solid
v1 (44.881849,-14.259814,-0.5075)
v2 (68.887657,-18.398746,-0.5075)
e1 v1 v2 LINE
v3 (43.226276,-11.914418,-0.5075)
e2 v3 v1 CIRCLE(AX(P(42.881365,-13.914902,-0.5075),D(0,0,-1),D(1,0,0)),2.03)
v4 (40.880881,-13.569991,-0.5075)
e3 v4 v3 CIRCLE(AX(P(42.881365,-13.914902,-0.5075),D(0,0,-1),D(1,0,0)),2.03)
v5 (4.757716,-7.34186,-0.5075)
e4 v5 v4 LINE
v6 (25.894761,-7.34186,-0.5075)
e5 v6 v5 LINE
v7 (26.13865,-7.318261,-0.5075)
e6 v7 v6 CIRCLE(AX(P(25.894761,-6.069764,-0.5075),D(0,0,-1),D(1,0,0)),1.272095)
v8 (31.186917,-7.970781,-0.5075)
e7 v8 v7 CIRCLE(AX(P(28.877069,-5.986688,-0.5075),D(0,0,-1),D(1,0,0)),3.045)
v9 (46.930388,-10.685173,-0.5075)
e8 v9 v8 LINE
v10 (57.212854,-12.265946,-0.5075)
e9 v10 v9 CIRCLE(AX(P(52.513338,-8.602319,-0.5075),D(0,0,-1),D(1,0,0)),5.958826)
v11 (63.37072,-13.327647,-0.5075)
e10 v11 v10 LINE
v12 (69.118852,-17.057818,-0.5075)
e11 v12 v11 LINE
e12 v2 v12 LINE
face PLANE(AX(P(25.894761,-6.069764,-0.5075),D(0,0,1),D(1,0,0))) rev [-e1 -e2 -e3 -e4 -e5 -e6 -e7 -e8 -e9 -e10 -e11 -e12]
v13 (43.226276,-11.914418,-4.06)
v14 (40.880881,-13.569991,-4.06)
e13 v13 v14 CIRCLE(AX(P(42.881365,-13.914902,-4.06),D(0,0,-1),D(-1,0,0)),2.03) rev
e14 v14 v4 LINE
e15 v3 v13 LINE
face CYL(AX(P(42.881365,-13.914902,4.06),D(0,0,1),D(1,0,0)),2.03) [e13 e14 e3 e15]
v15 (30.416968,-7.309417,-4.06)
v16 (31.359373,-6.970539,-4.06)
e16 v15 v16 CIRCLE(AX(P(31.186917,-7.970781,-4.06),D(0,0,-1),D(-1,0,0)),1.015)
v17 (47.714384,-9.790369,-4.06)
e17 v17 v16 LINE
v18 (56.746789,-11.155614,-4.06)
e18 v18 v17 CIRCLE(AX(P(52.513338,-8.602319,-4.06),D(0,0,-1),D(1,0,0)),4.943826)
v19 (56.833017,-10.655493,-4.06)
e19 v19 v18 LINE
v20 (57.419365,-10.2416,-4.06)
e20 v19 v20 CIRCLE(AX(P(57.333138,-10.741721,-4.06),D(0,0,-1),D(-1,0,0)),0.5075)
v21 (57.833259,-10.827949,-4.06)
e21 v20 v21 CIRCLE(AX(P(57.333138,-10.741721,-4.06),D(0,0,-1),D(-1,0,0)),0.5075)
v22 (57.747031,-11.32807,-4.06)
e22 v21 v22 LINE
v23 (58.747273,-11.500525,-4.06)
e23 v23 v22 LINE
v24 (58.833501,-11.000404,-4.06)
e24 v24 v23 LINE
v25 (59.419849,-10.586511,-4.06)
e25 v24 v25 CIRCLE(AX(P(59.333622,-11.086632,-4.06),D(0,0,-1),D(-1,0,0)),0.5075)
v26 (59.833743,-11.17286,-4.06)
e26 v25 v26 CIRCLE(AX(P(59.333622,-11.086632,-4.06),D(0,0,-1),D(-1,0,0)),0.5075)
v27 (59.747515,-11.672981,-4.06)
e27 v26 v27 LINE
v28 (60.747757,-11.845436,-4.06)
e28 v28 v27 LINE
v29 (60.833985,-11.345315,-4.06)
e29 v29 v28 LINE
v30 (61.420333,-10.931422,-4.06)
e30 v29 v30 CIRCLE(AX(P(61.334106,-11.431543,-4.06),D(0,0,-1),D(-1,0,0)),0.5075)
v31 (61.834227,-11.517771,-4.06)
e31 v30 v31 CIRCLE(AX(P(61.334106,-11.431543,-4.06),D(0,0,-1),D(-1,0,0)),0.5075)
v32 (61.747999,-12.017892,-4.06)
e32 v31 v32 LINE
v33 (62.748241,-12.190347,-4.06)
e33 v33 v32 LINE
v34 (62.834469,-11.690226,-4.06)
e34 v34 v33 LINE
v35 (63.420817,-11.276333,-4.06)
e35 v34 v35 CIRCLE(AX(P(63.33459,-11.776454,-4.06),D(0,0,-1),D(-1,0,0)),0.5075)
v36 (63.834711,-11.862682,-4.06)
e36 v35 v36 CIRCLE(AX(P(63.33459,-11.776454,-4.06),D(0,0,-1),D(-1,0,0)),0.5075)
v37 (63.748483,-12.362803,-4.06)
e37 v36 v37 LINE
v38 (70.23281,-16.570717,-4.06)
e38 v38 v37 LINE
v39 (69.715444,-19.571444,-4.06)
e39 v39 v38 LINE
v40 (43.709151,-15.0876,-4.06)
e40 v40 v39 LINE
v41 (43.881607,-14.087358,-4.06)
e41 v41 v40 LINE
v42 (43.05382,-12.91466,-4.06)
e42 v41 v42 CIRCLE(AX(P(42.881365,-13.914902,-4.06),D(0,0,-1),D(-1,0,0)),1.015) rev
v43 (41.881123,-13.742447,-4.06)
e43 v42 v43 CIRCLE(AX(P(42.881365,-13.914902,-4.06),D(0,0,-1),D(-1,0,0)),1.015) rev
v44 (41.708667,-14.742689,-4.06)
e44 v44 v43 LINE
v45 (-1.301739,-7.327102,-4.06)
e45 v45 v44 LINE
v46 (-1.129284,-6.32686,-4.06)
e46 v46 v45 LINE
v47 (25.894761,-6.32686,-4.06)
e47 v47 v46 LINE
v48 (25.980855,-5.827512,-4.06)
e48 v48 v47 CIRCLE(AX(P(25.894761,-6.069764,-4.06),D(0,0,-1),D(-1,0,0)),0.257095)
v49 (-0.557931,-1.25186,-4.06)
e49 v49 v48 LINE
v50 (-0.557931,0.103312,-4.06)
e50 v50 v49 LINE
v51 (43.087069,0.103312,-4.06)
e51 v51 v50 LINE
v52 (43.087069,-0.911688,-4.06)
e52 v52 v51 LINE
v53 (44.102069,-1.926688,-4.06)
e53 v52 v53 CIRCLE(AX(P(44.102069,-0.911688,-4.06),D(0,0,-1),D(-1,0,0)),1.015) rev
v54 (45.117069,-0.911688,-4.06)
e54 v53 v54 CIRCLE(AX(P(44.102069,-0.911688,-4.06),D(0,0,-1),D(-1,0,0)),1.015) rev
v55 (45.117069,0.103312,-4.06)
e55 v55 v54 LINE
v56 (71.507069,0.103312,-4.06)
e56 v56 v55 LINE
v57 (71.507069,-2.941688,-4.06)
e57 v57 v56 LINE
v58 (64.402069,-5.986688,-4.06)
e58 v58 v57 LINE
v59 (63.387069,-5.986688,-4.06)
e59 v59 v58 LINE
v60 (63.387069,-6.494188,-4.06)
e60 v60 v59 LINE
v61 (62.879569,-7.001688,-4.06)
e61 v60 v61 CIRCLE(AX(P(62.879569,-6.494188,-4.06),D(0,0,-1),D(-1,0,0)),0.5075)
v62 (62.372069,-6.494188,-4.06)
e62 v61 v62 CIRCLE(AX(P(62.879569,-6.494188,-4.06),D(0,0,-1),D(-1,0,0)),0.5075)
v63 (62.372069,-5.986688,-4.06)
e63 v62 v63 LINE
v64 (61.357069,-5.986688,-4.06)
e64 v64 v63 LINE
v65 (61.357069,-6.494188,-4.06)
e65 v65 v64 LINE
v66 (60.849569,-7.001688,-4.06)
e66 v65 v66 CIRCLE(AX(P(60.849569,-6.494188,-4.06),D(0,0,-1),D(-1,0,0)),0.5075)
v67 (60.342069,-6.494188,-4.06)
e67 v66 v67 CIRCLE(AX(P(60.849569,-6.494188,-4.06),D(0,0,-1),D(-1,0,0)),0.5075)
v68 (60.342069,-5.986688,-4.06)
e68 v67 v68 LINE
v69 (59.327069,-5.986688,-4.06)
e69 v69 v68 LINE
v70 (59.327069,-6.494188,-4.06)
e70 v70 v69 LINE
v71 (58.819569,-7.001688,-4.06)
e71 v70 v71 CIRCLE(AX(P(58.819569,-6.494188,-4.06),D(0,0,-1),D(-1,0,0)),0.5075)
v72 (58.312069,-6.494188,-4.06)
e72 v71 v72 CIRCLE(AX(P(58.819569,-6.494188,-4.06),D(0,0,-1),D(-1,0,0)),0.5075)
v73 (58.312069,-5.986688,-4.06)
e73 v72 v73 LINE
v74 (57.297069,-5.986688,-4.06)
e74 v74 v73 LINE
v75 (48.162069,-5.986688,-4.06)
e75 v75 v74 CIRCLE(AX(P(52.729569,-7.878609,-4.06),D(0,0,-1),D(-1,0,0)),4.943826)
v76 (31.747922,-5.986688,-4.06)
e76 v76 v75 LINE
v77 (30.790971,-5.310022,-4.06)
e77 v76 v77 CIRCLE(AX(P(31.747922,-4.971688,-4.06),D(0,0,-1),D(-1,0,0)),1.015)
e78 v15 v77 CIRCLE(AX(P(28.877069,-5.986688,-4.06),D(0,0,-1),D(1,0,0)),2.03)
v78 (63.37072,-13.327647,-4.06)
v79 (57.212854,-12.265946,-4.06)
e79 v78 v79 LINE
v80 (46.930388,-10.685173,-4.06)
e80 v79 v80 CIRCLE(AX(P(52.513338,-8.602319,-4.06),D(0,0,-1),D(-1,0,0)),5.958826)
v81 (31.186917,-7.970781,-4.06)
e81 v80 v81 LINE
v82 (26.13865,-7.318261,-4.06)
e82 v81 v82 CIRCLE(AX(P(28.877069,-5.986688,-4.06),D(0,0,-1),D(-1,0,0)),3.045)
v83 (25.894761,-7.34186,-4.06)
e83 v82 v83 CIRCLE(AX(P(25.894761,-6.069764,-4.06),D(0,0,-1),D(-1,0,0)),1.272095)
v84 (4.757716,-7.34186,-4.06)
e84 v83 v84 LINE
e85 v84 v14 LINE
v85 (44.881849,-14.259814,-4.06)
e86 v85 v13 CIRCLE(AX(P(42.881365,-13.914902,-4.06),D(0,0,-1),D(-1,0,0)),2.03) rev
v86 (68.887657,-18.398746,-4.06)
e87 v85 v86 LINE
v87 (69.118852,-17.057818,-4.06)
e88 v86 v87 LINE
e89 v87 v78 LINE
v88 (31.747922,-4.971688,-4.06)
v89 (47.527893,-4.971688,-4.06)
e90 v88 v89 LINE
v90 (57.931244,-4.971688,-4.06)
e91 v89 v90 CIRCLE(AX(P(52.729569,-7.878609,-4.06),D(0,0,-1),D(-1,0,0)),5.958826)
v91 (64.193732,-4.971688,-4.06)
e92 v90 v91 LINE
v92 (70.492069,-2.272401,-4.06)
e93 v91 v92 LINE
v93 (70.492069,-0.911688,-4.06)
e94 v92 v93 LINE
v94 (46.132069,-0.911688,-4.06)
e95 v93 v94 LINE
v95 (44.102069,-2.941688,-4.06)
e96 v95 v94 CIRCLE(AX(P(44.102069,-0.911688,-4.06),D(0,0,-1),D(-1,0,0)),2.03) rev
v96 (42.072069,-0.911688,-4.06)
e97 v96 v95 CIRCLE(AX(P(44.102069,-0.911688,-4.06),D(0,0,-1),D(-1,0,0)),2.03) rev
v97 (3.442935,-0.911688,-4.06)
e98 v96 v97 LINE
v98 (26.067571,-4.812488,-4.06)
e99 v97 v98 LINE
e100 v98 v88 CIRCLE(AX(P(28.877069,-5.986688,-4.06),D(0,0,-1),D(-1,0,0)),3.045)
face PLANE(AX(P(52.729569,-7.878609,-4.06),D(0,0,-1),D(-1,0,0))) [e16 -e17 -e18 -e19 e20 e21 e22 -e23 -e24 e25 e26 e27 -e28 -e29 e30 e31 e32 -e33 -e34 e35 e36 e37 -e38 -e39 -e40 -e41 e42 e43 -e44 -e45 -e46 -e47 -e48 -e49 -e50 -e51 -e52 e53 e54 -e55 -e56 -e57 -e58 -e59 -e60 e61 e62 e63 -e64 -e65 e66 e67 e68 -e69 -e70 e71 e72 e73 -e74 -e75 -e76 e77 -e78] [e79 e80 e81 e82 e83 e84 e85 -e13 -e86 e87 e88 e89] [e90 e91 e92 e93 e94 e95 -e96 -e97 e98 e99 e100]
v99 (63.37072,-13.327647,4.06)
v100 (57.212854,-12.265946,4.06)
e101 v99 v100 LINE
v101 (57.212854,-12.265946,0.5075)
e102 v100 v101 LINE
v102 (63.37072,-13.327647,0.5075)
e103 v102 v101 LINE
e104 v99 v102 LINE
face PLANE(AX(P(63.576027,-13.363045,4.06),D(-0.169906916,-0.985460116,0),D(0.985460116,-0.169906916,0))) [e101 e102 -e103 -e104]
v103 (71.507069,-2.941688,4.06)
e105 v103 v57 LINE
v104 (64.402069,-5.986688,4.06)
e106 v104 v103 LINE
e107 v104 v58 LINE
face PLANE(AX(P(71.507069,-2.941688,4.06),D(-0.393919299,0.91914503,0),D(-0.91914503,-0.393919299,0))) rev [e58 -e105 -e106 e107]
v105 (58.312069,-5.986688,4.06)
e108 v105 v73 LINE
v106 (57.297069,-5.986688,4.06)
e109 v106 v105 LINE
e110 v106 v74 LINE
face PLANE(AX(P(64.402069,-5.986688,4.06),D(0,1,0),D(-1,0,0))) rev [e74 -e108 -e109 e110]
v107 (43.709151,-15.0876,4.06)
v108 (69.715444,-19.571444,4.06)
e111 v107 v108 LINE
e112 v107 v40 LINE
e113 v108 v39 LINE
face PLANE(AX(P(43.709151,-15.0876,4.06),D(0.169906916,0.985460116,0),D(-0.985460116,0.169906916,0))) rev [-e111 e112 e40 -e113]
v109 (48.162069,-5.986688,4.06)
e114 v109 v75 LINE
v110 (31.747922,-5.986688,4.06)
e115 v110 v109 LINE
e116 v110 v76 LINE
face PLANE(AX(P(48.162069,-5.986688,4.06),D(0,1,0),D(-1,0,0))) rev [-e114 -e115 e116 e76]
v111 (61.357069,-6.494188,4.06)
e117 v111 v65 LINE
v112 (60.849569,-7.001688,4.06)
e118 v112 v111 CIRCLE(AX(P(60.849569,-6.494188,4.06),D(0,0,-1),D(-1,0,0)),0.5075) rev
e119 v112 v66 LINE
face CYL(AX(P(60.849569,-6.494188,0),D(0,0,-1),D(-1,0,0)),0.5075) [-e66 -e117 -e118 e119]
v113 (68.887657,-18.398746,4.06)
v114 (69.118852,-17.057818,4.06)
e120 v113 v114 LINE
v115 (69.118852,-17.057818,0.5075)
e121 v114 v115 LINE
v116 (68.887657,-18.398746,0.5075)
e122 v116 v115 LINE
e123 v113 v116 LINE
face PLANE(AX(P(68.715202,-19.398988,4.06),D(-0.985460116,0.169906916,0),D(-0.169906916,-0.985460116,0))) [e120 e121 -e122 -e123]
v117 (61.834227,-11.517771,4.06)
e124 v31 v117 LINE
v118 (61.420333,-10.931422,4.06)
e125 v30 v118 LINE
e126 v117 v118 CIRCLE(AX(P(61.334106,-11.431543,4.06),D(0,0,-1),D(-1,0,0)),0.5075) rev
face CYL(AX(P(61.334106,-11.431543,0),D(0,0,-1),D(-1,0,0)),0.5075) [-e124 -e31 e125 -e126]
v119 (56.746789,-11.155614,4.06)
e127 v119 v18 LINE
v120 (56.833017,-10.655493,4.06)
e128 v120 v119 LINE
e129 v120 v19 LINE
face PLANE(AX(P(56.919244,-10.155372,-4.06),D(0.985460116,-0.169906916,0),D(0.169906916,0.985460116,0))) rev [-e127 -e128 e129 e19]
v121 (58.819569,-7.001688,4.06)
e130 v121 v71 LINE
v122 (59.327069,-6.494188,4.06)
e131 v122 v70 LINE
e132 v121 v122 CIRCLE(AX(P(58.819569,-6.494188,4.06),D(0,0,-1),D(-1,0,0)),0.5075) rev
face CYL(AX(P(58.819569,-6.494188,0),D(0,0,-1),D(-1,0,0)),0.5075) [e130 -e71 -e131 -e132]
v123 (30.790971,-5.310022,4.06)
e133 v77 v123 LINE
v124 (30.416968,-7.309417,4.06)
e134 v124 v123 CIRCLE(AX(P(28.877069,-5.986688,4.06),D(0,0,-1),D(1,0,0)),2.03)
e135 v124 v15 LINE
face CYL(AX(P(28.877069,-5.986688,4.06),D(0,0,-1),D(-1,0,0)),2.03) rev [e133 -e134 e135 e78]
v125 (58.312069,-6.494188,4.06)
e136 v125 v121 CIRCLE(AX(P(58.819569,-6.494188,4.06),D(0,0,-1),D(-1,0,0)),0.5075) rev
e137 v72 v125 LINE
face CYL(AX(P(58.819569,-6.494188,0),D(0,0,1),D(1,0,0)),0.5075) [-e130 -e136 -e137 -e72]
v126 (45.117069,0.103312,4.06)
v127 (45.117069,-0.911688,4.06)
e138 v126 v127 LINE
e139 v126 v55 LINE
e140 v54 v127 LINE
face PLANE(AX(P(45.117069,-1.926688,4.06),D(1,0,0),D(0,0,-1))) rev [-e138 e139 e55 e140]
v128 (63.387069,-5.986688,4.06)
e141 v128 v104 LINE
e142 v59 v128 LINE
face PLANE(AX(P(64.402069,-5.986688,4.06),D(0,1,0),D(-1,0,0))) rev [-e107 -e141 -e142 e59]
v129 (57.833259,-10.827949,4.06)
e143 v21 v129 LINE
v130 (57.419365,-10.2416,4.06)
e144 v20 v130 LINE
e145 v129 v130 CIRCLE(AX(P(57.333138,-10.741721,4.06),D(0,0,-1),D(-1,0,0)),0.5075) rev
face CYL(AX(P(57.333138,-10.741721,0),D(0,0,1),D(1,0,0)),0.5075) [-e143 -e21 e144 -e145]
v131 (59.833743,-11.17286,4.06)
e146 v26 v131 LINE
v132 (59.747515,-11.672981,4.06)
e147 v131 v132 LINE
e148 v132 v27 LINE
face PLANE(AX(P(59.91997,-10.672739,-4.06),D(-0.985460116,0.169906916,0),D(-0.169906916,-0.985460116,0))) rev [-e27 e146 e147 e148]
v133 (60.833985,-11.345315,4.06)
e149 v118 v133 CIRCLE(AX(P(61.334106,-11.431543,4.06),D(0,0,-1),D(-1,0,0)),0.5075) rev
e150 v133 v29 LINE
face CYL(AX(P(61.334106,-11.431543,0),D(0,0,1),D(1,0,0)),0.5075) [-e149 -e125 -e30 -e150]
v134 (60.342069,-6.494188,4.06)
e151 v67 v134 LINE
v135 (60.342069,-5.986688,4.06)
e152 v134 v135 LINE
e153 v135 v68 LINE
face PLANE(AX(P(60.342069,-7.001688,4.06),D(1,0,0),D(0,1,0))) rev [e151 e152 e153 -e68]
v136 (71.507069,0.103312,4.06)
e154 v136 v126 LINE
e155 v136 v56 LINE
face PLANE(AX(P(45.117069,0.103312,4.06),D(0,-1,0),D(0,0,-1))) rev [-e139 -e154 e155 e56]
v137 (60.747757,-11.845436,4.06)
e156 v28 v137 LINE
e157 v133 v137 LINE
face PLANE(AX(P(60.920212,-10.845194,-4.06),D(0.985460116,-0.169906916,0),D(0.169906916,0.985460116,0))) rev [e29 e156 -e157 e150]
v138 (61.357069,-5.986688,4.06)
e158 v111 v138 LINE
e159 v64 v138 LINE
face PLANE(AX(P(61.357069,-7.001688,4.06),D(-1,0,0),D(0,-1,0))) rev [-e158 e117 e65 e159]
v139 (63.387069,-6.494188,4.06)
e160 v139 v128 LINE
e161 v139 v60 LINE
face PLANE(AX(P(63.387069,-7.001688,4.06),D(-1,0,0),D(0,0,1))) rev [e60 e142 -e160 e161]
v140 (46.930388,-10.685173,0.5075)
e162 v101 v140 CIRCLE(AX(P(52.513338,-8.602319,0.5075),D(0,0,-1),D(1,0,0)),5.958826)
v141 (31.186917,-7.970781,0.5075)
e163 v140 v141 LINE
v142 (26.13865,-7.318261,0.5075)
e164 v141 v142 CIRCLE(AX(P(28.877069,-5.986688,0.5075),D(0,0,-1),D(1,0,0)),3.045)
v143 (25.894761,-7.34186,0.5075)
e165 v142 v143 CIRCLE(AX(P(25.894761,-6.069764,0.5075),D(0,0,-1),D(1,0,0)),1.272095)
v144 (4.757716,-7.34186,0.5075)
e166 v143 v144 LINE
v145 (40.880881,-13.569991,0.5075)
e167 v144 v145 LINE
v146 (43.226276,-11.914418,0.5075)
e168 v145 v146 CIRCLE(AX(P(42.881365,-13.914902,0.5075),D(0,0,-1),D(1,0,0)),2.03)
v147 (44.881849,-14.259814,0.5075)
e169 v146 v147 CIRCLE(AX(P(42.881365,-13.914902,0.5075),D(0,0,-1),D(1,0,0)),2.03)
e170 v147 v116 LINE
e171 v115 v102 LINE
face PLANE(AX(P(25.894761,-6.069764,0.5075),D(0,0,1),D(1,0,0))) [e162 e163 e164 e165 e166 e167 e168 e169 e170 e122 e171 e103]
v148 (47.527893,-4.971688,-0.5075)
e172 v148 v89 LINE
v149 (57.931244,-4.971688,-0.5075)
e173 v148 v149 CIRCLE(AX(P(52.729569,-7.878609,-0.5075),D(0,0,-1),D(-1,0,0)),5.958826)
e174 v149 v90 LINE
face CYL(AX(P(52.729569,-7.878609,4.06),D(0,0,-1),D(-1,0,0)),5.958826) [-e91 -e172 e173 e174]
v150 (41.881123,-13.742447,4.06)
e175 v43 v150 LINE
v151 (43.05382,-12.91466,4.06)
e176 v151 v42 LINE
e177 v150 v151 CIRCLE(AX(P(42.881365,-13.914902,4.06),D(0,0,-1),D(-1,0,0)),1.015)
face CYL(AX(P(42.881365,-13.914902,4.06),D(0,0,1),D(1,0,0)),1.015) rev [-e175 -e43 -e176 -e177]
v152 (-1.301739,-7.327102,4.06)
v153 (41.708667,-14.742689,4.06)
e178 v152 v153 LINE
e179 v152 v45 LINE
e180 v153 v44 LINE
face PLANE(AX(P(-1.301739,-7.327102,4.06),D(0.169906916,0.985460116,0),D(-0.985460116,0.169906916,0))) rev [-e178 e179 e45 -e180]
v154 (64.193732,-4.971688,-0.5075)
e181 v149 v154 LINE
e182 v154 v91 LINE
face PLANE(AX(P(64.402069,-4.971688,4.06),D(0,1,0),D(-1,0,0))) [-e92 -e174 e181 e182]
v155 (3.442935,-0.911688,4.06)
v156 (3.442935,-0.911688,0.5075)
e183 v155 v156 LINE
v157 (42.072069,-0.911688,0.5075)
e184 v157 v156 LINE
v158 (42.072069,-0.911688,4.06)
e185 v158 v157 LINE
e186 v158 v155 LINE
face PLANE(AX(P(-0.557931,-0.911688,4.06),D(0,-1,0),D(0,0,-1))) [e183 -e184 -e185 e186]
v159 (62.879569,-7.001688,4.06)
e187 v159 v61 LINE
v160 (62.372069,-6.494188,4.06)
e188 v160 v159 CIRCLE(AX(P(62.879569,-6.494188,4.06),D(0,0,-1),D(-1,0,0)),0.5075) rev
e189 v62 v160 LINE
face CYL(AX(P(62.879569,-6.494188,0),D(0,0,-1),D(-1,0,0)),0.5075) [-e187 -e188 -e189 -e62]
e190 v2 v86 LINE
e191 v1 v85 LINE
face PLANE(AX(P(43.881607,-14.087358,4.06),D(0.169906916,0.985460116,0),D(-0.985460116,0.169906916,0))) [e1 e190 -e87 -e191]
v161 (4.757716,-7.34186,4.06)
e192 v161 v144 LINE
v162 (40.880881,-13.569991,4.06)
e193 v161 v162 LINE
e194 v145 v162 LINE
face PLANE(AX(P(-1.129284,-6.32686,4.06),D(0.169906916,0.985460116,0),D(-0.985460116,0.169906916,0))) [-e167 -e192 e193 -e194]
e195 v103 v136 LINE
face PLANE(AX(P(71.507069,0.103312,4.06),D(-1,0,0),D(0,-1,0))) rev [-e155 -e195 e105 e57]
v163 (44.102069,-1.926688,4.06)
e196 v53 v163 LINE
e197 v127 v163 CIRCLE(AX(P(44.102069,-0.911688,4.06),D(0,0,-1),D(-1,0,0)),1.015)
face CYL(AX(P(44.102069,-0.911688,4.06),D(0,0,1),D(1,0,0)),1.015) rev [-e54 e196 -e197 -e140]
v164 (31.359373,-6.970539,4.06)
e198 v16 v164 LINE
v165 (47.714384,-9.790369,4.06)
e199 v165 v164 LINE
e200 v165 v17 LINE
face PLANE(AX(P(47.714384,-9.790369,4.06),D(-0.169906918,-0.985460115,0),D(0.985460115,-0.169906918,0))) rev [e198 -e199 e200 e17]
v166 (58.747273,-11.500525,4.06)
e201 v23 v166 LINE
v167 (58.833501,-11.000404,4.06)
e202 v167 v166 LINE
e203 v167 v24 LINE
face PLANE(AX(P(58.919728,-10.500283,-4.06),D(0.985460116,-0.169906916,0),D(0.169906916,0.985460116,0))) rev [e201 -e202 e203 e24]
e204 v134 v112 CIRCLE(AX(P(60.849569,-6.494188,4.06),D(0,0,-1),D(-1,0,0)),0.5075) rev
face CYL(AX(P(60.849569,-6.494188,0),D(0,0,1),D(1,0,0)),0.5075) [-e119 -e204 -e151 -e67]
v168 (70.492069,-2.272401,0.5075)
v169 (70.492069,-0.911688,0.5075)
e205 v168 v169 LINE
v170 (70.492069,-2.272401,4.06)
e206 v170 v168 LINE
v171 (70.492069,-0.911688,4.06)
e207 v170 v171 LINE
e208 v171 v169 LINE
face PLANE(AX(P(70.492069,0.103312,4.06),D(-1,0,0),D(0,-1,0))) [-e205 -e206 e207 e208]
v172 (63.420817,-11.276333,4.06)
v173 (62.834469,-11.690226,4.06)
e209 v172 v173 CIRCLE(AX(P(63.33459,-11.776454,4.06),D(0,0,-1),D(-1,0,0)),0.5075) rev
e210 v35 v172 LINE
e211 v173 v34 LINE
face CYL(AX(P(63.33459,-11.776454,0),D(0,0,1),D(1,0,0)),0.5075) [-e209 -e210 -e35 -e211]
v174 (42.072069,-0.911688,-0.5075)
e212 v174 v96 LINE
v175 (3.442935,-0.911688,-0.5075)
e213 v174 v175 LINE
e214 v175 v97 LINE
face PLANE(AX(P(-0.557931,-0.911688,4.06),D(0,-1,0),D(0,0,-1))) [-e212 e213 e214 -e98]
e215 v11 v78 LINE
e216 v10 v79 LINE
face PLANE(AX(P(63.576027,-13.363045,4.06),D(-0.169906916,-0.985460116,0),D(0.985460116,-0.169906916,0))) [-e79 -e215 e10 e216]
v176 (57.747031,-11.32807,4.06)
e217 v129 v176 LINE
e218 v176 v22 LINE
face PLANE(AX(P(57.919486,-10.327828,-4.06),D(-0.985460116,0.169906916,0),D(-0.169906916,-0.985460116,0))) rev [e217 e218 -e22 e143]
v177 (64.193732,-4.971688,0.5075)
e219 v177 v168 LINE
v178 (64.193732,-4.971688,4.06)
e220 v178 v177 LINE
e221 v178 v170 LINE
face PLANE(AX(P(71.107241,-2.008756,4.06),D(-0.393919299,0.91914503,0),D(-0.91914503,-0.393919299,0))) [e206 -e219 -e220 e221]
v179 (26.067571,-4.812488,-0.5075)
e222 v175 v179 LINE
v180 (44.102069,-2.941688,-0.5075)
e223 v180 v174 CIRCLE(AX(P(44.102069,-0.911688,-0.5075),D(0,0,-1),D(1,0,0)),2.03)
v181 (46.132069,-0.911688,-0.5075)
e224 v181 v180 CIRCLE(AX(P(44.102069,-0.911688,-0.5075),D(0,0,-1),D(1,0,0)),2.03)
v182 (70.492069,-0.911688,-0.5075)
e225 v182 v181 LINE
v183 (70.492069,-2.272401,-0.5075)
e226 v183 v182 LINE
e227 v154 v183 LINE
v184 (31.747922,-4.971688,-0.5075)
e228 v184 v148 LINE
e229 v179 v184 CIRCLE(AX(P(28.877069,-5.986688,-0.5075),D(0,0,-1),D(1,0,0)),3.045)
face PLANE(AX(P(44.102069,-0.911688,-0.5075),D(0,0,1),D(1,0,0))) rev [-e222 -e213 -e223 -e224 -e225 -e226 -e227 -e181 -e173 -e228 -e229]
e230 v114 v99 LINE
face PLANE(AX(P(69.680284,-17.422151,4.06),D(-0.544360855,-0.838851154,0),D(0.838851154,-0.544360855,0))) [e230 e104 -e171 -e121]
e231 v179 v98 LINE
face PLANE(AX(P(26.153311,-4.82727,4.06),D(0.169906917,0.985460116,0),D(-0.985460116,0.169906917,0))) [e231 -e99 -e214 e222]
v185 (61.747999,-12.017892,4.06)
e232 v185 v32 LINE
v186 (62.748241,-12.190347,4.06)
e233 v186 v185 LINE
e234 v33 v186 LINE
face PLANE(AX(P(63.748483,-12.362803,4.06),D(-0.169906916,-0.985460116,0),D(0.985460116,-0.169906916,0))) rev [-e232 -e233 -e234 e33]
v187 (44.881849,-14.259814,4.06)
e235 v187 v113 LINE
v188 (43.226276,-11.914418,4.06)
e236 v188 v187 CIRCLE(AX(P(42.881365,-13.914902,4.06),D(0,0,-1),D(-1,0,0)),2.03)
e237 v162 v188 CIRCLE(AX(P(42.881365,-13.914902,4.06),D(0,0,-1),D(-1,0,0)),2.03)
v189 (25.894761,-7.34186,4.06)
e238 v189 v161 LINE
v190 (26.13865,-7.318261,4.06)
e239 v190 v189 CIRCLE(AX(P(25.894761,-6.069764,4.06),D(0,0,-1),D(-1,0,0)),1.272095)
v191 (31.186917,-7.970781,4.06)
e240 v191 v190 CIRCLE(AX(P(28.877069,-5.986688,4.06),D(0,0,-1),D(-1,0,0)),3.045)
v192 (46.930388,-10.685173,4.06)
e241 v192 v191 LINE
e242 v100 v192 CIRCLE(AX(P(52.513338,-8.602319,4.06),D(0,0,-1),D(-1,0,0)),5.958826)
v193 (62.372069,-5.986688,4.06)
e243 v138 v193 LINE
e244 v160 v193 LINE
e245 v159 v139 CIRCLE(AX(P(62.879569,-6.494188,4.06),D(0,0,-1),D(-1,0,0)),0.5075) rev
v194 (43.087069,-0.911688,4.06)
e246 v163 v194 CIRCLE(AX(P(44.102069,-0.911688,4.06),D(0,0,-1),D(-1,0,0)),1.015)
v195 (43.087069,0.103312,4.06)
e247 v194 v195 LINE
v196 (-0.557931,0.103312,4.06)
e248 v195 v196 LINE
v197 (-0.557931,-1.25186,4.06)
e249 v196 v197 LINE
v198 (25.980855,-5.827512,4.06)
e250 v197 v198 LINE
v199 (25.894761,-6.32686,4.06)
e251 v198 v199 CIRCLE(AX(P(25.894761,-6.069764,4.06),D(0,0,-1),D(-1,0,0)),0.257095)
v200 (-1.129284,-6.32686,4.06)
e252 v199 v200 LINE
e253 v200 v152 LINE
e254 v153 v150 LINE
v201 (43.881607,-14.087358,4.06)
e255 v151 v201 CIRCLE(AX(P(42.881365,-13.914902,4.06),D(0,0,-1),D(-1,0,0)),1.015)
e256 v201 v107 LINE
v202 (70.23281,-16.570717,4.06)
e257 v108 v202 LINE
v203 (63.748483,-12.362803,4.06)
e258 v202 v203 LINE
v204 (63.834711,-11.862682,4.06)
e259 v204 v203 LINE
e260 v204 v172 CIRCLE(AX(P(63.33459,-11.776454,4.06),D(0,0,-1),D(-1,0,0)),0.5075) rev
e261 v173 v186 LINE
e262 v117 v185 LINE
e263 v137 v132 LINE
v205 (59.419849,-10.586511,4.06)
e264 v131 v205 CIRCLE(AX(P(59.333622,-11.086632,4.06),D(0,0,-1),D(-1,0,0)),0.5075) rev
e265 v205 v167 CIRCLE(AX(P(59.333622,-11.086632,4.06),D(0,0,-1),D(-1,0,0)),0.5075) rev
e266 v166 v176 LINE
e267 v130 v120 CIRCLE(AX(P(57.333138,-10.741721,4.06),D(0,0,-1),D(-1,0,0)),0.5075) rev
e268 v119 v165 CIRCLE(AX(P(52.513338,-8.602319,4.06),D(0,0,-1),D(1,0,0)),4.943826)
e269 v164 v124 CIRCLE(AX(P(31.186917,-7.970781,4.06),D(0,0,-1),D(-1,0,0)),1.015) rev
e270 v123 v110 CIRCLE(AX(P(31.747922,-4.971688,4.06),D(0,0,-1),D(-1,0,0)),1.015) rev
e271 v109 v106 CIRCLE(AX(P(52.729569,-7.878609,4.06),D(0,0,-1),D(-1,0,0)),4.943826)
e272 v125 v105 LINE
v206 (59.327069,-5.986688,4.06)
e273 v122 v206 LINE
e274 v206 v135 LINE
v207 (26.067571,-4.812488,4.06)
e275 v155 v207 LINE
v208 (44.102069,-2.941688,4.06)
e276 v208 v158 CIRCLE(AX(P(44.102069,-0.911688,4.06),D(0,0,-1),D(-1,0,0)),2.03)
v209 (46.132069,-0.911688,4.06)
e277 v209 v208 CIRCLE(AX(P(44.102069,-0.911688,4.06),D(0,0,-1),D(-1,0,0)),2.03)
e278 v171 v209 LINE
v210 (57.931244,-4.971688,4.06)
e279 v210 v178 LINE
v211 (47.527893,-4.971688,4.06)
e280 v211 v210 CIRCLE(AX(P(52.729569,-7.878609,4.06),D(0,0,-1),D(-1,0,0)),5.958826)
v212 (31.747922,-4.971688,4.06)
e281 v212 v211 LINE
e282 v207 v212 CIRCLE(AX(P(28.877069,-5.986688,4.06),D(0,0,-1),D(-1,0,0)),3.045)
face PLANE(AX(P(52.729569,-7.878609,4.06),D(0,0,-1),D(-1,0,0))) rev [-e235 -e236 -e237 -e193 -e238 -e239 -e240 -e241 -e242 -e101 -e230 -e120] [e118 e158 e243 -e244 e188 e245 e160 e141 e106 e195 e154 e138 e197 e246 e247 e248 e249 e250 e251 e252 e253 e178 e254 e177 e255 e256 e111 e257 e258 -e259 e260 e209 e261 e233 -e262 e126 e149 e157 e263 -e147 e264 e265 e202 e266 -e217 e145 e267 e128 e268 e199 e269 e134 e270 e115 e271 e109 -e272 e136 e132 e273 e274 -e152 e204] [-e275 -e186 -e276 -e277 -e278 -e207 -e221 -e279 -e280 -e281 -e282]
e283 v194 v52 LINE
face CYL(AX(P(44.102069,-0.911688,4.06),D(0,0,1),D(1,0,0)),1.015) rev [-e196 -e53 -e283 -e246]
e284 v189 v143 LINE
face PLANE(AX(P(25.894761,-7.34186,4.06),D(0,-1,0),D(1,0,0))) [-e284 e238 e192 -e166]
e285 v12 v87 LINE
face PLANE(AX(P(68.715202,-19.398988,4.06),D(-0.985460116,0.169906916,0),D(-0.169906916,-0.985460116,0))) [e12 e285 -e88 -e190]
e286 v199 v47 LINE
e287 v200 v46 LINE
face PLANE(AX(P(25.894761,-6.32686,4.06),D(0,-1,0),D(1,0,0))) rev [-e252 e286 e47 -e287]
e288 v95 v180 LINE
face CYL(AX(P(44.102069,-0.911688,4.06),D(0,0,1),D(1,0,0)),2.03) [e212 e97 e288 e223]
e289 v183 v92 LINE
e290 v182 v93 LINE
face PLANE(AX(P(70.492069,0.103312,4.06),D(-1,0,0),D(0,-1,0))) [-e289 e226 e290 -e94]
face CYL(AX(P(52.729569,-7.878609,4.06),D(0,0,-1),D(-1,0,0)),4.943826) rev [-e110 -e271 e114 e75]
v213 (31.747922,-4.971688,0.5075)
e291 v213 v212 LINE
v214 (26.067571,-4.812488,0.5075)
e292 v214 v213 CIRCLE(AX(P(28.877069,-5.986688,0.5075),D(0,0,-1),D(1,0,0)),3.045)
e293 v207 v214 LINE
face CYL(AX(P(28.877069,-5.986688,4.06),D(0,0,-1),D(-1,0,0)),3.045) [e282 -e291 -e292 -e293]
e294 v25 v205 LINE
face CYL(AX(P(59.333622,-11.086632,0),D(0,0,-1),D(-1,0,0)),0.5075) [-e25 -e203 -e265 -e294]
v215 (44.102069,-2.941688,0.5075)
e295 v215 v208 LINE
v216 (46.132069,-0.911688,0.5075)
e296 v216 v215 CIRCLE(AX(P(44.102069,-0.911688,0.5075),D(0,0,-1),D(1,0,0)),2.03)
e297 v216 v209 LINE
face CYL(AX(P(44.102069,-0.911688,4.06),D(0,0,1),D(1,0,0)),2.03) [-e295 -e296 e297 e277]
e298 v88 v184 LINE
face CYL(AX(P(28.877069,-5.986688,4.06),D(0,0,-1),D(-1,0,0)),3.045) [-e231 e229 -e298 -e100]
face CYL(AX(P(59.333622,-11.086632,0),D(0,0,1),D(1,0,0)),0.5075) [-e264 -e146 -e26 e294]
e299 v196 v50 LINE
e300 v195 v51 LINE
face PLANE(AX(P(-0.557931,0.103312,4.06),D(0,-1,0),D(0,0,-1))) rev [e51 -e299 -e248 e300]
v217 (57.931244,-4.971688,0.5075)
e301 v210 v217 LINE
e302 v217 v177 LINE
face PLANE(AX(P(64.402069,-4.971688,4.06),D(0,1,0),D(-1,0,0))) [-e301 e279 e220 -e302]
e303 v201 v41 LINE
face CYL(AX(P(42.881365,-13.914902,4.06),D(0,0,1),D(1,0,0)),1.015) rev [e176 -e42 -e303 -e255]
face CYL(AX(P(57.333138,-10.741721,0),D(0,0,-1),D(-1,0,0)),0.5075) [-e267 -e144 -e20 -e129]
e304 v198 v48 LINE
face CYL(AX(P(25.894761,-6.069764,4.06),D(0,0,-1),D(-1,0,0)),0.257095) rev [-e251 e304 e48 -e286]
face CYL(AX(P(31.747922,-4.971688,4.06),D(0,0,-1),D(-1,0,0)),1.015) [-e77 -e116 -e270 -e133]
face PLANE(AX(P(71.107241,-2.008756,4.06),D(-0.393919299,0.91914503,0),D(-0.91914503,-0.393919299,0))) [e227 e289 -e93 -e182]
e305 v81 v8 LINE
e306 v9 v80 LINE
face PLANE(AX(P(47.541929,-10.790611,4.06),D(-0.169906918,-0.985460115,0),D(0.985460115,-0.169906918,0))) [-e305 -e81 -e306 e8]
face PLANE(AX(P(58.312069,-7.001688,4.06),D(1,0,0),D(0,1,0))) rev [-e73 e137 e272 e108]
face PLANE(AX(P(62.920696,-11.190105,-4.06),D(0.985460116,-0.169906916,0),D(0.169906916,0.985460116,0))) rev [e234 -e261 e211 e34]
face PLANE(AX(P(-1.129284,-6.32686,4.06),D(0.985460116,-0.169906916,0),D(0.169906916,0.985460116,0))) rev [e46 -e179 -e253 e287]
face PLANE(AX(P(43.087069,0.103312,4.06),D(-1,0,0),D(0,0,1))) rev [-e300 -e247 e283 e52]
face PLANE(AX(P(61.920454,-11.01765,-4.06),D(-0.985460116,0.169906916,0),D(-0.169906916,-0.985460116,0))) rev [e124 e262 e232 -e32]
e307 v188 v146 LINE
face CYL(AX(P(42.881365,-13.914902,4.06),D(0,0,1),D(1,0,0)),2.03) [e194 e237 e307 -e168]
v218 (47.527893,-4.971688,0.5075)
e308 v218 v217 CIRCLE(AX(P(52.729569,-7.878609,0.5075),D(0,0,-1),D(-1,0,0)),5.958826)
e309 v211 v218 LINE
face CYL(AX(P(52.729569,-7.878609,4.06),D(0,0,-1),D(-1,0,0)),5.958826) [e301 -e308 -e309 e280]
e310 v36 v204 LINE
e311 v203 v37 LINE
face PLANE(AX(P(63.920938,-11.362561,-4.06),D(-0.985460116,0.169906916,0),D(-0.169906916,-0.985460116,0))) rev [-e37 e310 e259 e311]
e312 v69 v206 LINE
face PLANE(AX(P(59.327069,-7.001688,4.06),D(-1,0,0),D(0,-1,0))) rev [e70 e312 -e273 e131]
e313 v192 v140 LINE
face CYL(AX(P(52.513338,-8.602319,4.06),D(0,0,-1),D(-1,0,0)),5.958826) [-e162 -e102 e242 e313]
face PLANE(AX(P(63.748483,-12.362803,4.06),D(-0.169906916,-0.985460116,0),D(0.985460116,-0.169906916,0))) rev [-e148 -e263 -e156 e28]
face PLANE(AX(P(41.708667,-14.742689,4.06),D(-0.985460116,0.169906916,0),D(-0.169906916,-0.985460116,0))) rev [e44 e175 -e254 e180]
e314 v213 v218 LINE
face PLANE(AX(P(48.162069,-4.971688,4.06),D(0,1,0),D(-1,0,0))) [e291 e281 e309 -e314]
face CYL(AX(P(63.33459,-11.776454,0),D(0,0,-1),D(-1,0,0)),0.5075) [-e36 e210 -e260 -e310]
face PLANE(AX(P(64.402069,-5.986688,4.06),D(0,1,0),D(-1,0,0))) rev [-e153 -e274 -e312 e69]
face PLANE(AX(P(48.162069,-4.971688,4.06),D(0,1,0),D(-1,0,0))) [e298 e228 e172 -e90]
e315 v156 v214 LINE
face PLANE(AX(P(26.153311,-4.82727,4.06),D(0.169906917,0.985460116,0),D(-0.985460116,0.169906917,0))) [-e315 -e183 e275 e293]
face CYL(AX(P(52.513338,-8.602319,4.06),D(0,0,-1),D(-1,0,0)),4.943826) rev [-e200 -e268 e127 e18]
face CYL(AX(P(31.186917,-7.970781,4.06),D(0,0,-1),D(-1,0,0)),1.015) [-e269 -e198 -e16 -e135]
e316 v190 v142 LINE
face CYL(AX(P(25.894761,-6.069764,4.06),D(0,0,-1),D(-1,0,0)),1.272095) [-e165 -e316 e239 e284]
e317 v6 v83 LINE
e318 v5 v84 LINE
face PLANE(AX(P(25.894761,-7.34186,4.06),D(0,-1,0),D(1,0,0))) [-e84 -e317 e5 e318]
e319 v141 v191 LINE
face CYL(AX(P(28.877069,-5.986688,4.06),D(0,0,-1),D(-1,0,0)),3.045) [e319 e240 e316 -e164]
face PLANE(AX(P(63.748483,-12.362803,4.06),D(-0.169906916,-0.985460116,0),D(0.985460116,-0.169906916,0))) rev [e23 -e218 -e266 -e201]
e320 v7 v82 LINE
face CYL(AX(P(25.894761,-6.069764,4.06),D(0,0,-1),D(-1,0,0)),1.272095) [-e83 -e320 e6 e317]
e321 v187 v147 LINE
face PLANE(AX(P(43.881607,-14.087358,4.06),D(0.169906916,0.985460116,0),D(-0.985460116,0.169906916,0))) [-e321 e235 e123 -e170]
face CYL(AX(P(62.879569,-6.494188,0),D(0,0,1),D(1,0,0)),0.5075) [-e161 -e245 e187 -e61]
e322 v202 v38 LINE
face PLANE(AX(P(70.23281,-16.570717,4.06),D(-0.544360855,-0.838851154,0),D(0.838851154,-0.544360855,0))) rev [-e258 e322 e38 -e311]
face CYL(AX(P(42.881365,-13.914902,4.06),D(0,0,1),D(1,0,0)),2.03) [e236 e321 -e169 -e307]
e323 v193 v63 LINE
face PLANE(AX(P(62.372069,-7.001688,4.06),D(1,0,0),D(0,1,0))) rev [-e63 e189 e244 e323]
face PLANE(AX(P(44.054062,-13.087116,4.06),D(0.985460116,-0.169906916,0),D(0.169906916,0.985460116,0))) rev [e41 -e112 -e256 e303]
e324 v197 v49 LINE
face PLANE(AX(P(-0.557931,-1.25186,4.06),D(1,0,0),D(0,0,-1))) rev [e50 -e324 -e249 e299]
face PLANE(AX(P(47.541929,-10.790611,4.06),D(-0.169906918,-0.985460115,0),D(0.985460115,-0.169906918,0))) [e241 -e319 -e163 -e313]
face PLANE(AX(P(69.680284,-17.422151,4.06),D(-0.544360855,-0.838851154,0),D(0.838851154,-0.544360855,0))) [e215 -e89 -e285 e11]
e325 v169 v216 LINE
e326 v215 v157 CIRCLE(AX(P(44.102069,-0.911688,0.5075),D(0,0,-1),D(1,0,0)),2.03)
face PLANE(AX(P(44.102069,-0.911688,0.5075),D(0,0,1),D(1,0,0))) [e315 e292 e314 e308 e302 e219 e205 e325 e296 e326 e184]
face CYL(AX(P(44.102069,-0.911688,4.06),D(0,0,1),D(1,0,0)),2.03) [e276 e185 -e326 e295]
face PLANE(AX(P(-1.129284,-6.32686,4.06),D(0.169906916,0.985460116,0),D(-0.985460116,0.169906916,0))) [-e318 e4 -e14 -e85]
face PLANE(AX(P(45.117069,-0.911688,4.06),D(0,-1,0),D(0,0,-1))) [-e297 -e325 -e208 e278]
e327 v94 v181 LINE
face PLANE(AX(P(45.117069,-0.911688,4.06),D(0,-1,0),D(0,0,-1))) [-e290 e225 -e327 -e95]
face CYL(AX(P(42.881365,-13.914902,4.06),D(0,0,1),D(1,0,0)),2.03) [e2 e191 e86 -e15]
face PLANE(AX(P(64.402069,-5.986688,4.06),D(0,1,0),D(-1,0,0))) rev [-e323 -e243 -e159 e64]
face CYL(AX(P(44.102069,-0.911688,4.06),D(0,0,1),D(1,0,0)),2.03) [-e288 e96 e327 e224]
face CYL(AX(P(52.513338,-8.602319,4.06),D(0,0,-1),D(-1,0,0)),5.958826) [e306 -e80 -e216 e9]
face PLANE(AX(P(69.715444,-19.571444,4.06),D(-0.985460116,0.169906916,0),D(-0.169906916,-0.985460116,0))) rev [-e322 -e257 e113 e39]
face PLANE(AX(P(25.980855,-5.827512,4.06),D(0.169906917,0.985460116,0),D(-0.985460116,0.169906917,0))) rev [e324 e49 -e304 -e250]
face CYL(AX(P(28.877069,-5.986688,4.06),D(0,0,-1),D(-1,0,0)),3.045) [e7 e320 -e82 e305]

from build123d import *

# Parameters (mm, degrees)
BRUTO_GRAMPO_1_START   = -4
BRUTO_GRAMPO_1_DEPTH   = 8
BRUTO_GRAMPO_1_START_2 = -0.5
BRUTO_GRAMPO_1_2_DEPTH = 1
ESCALA1_SCALE          = 1.015


# Read off the part's stored shape, not the designer's step: Bruto-Grampo-1
with BuildPart() as part:
    # Bruto-Grampo-1 outline → Bruto-Grampo-1 (new body)
    with BuildSketch(Plane.XY.offset(BRUTO_GRAMPO_1_START)):
        with BuildLine():
            Line((63, -6), (64, -6))
            Line((64, -6), (71, -3))
            Line((71, -3), (71, 0))
            Line((71, 0), (45, 0))
            Line((45, 0), (45, -1))
            ThreePointArc((45, -1), (44.707106781, -1.707106781), (44, -2))
            ThreePointArc((44, -2), (43.292893219, -1.707106781), (43, -1))
            Line((43, -1), (43, 0))
            Line((43, 0), (0, 0))
            Line((0, 0), (0, -1.335144068))
            Line((0, -1.335144068), (26.146588044, -5.84317649))
            ThreePointArc((26.146588044, -5.84317649), (26.311379183, -6.124884785), (26.061766048, -6.335144068))
            Line((26.061766048, -6.335144068), (-0.562908784, -6.335144068))
            Line((-0.562908784, -6.335144068), (-0.732815701, -7.320604184))
            Line((-0.732815701, -7.320604184), (41.641969276, -14.626601592))
            Line((41.641969276, -14.626601592), (41.811876193, -13.641141477))
            ThreePointArc((41.811876193, -13.641141477), (42.220653111, -12.99408053), (42.967243225, -12.825588277))
            ThreePointArc((42.967243225, -12.825588277), (43.614304172, -13.234365196), (43.782796424, -13.98095531))
            Line((43.782796424, -13.98095531), (43.612889508, -14.966415425))
            Line((43.612889508, -14.966415425), (69.234852518, -19.383995254))
            Line((69.234852518, -19.383995254), (69.744573267, -16.427614907))
            Line((69.744573267, -16.427614907), (63.356073202, -12.281886143))
            Line((63.356073202, -12.281886143), (63.44102666, -11.789156085))
            ThreePointArc((63.44102666, -11.789156085), (63.356780534, -11.415861028), (63.03325006, -11.211472569))
            ThreePointArc((63.03325006, -11.211472569), (62.659955003, -11.295718696), (62.455566544, -11.619249169))
            Line((62.455566544, -11.619249169), (62.370613086, -12.111979227))
            Line((62.370613086, -12.111979227), (61.38515297, -11.94207231))
            Line((61.38515297, -11.94207231), (61.470106428, -11.449342252))
            ThreePointArc((61.470106428, -11.449342252), (61.385860302, -11.076047195), (61.062329829, -10.871658736))
            ThreePointArc((61.062329829, -10.871658736), (60.689034772, -10.955904863), (60.484646313, -11.279435336))
            Line((60.484646313, -11.279435336), (60.399692854, -11.772165394))
            Line((60.399692854, -11.772165394), (59.414232739, -11.602258477))
            Line((59.414232739, -11.602258477), (59.499186197, -11.109528419))
            ThreePointArc((59.499186197, -11.109528419), (59.414940071, -10.736233362), (59.091409597, -10.531844903))
            ThreePointArc((59.091409597, -10.531844903), (58.71811454, -10.61609103), (58.513726081, -10.939621503))
            Line((58.513726081, -10.939621503), (58.428772623, -11.432351561))
            Line((58.428772623, -11.432351561), (57.443312507, -11.262444644))
            Line((57.443312507, -11.262444644), (57.528265965, -10.769714587))
            ThreePointArc((57.528265965, -10.769714587), (57.444019839, -10.39641953), (57.120489366, -10.19203107))
            ThreePointArc((57.120489366, -10.19203107), (56.747194309, -10.276277197), (56.54280585, -10.59980767))
            Line((56.54280585, -10.59980767), (56.457852391, -11.092537728))
            ThreePointArc((56.457852391, -11.092537728), (51.559018801, -13.393037449), (47.558931741, -9.747468492))
            Line((47.558931741, -9.747468492), (31.445619908, -6.969311252))
            ThreePointArc((31.445619908, -6.969311252), (30.937336598, -7.013760518), (30.517142023, -7.303180937))
            ThreePointArc((30.517142023, -7.303180937), (27.034098374, -5.632261947), (30.885618205, -5.333333319))
            ThreePointArc((30.885618205, -5.333333319), (31.251076976, -5.816496576), (31.828427251, -5.999999999))
            Line((31.828427251, -5.999999999), (48, -5.999999999))
            ThreePointArc((48, -5.999999999), (52.5, -2.993196129), (57, -6))
            Line((57, -6), (58, -6))
            Line((58, -6), (58, -6.5))
            ThreePointArc((58, -6.5), (58.146446609, -6.853553391), (58.5, -7))
            ThreePointArc((58.5, -7), (58.853553391, -6.853553391), (59, -6.5))
            Line((59, -6.5), (59, -6))
            Line((59, -6), (60, -6))
            Line((60, -6), (60, -6.5))
            ThreePointArc((60, -6.5), (60.146446609, -6.853553391), (60.5, -7))
            ThreePointArc((60.5, -7), (60.853553391, -6.853553391), (61, -6.5))
            Line((61, -6.5), (61, -6))
            Line((61, -6), (62, -6))
            Line((62, -6), (62, -6.5))
            ThreePointArc((62, -6.5), (62.146446609, -6.853553391), (62.5, -7))
            ThreePointArc((62.5, -7), (62.853553391, -6.853553391), (63, -6.5))
            Line((63, -6.5), (63, -6))
        make_face()
        with BuildLine():
            Line((68.419299318, -18.228628222), (44.76825654, -14.150862226))
            ThreePointArc((44.76825654, -14.150862226), (44.431272035, -12.657681998), (43.137150142, -11.840128162))
            ThreePointArc((43.137150142, -11.840128162), (41.643969914, -12.177112667), (40.826416077, -13.47123456))
            Line((40.826416077, -13.47123456), (5.237091217, -7.335144068))
            Line((5.237091217, -7.335144068), (26.061766048, -7.335144068))
            ThreePointArc((26.061766048, -7.335144068), (26.18246919, -7.329318154), (26.302050161, -7.311894575))
            ThreePointArc((26.302050161, -7.311894575), (28.615430589, -8.975249078), (31.27571299, -7.954771367))
            Line((31.27571299, -7.954771367), (46.78652147, -10.629048718))
            ThreePointArc((46.78652147, -10.629048718), (51.394904099, -14.37957122), (56.91703012, -12.186460714))
            Line((56.91703012, -12.186460714), (62.983893007, -13.232471556))
            Line((62.983893007, -13.232471556), (68.647077183, -16.907516604))
            Line((68.647077183, -16.907516604), (68.419299318, -18.228628222))
        make_face(mode=Mode.SUBTRACT)
        with BuildLine():
            ThreePointArc((31.828427251, -4.999999999), (29.084046667, -3.001177418), (26.232021768, -4.84315203))
            Line((26.232021768, -4.84315203), (3.941739992, -1))
            Line((3.941739992, -1), (42, -1))
            ThreePointArc((42, -1), (42.585786438, -2.414213562), (44, -3))
            ThreePointArc((44, -3), (45.414213562, -2.414213562), (46, -1))
            Line((46, -1), (70, -1))
            Line((70, -1), (70, -2.340603842))
            Line((70, -2.340603842), (63.794742298, -5))
            Line((63.794742298, -5), (57.624803191, -5))
            ThreePointArc((57.624803191, -5), (52.500000001, -1.993196129), (47.37519681, -4.999999999))
            Line((47.37519681, -4.999999999), (31.828427251, -4.999999999))
        make_face(mode=Mode.SUBTRACT)
    extrude(amount=BRUTO_GRAMPO_1_DEPTH)

    # Bruto-Grampo-1 2 outline → Bruto-Grampo-1 2 (add)
    with BuildSketch(Plane.XY.offset(BRUTO_GRAMPO_1_START_2)):
        with BuildLine():
            ThreePointArc((43.137150142, -11.840128162), (44.431272035, -12.657681998), (44.76825654, -14.150862226))
            Line((44.76825654, -14.150862226), (68.419299318, -18.228628222))
            Line((68.419299318, -18.228628222), (68.647077183, -16.907516604))
            Line((68.647077183, -16.907516604), (62.983893007, -13.232471556))
            Line((62.983893007, -13.232471556), (56.91703012, -12.186460714))
            ThreePointArc((56.91703012, -12.186460714), (51.394904099, -14.37957122), (46.78652147, -10.629048718))
            Line((46.78652147, -10.629048718), (31.27571299, -7.954771367))
            ThreePointArc((31.27571299, -7.954771367), (28.615430589, -8.975249078), (26.302050161, -7.311894575))
            ThreePointArc((26.302050161, -7.311894575), (26.18246919, -7.329318154), (26.061766048, -7.335144068))
            Line((26.061766048, -7.335144068), (5.237091217, -7.335144068))
            Line((5.237091217, -7.335144068), (40.826416077, -13.47123456))
            ThreePointArc((40.826416077, -13.47123456), (41.643969914, -12.177112667), (43.137150142, -11.840128162))
        make_face()
        with BuildLine():
            Line((3.941739992, -1), (26.232021768, -4.84315203))
            ThreePointArc((26.232021768, -4.84315203), (29.084046667, -3.001177418), (31.828427251, -4.999999999))
            Line((31.828427251, -4.999999999), (47.37519681, -4.999999999))
            ThreePointArc((47.37519681, -4.999999999), (52.500000001, -1.993196129), (57.624803191, -5))
            Line((57.624803191, -5), (63.794742298, -5))
            Line((63.794742298, -5), (70, -2.340603842))
            Line((70, -2.340603842), (70, -1))
            Line((70, -1), (46, -1))
            ThreePointArc((46, -1), (45.414213562, -2.414213562), (44, -3))
            ThreePointArc((44, -3), (42.585786438, -2.414213562), (42, -1))
            Line((42, -1), (3.941739992, -1))
        make_face()
    extrude(amount=BRUTO_GRAMPO_1_2_DEPTH)


with BuildPart() as part_1:
    # Escala1: scaled about (37.195426372, -6.887443952, 0)
    add(part.part.scale(ESCALA1_SCALE).moved(Location((-0.557931396, 0.103311659, 0))))


solid = part_1.part
